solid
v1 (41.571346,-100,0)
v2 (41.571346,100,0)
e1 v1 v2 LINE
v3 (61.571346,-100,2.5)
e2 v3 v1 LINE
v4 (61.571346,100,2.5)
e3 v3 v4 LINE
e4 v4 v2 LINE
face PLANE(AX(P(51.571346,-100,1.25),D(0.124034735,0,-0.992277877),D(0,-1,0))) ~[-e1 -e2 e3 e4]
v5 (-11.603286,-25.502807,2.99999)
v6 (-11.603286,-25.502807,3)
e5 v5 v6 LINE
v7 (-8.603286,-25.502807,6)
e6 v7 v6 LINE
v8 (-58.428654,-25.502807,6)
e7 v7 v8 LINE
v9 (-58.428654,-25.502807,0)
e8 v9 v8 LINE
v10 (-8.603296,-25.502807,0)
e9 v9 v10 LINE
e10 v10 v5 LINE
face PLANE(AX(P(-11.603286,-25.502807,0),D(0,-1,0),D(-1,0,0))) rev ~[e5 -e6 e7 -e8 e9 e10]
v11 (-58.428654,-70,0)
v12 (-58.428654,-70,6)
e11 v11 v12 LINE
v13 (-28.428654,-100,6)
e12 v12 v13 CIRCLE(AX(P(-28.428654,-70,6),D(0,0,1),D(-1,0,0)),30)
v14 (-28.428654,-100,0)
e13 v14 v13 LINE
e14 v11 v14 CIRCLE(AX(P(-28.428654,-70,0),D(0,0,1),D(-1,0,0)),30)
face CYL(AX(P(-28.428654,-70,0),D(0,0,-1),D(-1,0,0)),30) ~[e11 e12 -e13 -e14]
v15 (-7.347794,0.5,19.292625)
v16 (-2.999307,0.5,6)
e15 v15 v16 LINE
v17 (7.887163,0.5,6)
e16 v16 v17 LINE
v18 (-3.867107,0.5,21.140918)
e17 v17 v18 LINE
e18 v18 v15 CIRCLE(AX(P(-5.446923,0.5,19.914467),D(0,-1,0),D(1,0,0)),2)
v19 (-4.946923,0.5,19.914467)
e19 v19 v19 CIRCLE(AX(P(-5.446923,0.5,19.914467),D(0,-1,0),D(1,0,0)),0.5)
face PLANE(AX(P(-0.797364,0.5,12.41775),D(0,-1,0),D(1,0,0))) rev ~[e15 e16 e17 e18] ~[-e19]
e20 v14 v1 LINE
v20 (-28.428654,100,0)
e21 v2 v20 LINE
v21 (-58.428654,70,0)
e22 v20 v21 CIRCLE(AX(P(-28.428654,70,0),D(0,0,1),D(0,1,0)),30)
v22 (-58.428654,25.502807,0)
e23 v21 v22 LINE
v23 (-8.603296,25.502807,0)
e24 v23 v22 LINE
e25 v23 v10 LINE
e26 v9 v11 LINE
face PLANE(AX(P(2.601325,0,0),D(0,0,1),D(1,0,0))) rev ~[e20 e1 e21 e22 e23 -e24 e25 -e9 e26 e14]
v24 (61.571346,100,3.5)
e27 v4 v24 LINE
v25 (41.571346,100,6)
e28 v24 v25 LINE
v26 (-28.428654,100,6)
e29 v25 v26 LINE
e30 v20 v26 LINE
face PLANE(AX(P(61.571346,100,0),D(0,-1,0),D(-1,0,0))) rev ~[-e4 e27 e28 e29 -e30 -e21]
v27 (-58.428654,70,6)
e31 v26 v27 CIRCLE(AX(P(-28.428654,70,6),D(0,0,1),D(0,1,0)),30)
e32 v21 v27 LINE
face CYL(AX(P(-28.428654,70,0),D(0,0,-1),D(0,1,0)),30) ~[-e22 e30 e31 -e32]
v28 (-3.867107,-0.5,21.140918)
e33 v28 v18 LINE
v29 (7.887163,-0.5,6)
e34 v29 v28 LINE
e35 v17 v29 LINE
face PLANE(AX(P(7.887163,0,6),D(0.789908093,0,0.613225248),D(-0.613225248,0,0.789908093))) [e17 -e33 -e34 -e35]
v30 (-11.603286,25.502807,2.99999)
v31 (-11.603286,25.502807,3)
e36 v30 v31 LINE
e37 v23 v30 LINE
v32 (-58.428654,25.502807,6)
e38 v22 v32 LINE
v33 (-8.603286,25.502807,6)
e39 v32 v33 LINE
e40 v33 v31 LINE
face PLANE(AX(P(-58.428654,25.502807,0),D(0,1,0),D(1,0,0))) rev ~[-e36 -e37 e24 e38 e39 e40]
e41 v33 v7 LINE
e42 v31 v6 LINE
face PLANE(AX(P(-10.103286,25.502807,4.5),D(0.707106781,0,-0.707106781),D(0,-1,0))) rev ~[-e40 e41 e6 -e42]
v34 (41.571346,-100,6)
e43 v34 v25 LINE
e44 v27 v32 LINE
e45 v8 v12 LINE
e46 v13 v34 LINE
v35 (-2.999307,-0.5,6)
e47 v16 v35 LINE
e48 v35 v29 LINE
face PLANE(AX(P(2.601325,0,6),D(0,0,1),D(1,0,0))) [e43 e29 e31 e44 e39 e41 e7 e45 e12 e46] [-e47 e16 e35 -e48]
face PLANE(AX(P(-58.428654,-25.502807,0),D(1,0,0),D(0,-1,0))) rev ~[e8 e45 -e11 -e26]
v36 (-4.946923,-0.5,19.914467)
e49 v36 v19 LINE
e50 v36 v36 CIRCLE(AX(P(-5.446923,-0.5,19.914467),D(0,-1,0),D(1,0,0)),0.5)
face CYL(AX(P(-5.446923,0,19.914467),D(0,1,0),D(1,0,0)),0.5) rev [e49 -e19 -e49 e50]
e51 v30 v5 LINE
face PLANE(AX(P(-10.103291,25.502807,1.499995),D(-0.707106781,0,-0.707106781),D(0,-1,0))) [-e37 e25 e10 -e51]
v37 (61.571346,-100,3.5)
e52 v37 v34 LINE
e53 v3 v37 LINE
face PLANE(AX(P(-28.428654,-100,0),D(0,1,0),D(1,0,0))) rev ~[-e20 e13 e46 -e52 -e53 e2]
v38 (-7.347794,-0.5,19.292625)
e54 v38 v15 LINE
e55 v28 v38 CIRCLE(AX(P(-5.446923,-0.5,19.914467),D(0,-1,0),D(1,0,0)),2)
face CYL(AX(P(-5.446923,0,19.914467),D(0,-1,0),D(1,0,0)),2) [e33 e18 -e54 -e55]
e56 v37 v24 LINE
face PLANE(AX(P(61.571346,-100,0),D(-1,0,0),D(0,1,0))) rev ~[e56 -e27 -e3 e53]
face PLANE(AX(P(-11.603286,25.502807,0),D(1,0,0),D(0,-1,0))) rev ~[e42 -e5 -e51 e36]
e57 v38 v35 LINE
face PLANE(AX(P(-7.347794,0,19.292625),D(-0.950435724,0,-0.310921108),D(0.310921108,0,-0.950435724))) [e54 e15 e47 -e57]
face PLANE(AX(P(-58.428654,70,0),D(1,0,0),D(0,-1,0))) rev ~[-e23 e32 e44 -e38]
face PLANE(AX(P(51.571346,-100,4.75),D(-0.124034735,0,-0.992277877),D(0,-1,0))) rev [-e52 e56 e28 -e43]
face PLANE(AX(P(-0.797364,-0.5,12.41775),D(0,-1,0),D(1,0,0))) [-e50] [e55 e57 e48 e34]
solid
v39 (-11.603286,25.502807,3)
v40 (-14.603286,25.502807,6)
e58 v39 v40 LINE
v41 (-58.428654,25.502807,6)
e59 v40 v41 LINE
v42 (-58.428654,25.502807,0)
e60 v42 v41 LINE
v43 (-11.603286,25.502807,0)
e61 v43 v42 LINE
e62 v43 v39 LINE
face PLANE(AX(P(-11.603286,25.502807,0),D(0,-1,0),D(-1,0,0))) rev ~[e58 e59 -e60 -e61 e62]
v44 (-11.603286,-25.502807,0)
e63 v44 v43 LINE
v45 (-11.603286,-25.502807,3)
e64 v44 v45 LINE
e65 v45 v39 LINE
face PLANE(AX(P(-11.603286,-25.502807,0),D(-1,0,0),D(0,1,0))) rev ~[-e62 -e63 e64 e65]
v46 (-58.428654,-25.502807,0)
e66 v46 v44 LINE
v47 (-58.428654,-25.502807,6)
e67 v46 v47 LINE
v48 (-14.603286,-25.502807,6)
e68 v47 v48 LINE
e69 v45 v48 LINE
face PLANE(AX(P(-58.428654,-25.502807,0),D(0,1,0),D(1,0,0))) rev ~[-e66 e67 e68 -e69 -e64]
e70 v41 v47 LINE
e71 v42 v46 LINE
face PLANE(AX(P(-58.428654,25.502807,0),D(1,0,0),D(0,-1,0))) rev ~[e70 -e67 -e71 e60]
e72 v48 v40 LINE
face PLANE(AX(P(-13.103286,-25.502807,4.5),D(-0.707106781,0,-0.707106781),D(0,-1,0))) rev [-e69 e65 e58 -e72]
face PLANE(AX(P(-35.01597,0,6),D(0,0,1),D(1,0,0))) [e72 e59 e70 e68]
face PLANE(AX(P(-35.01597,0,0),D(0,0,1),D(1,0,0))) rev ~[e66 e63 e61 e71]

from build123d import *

# Parameters (mm, degrees)
F1_DEPTH = 6
F2_SIZE2 = 20
F2_SIZE  = 2.5
F3_DEPTH = 6
F4_SIZE2 = 3
F4_SIZE  = 3
F5_SIZE2 = 3
F5_SIZE  = 3
F6_SIZE2 = 2.99999
F6_SIZE  = 2.99999
F7_R     = 0.5
F8_DEPTH = 0.5


# Not quite as in the source:
# - a fillet or chamfer is up to 0.001 mm smaller than in the source, because OpenCascade refuses the exact size


with BuildPart() as f1:
    # F0 (on Top) → F1 (new body)
    with BuildSketch(Plane.XY):
        with BuildLine():
            Line((61.5713464236, -100), (61.5713464236, 100))
            Line((61.5713464236, 100), (-28.4286535764, 100))
            ThreePointArc((-28.4286535764, 100), (-49.641857012, 91.2132034356), (-58.4286535764, 70))
            Line((-58.4286535764, 70), (-58.4286535764, 25.5028065294))
            Line((-58.4286535764, 25.5028065294), (-11.6032855585, 25.5028065294))
            Line((-11.6032855585, 25.5028065294), (-11.6032855585, 0))
            Line((-11.6032855585, 0), (-11.6032855585, -25.5028065294))
            Line((-11.6032855585, -25.5028065294), (-58.4286535764, -25.5028065294))
            Line((-58.4286535764, -25.5028065294), (-58.4286535764, -70))
            ThreePointArc((-58.4286535764, -70), (-49.641857012, -91.2132034356), (-28.4286535764, -100))
            Line((-28.4286535764, -100), (61.5713464236, -100))
        make_face()
    extrude(amount=F1_DEPTH)

    # F2
    f2_edges = [f1.edges().sort_by_distance(p)[0] for p in [
        (61.571346, 0, 6),
        (61.571346, 0, 0),
    ]]
    f2_side = f1.faces().sort_by_distance((61.571346, 0, 3))[0]
    chamfer(f2_edges, length=F2_SIZE, length2=F2_SIZE2, reference=f2_side)

    # F4
    f4_edges = [f1.edges().sort_by_distance(p)[0] for p in [
        (-11.603286, 0, 6),
    ]]
    chamfer(f4_edges, length=F4_SIZE, length2=F4_SIZE2)

    # F6 (size 3 and 3 in the source; OpenCascade refuses exactly that, so slightly less here)
    f6_edges = [f1.edges().sort_by_distance(p)[0] for p in [
        (-11.603286, 0, 0),
    ]]
    chamfer(f6_edges, length=F6_SIZE, length2=F6_SIZE2)

    # F7 (on Front) → F8 (join, symmetric)
    with BuildSketch(Plane.XZ):
        with BuildLine():
            Line((-7.3477944259, 19.2926249586), (-2.9993071221, 6))
            Line((-2.9993071221, 6), (7.8871631995, 6))
            Line((7.8871631995, 6), (-3.8671067929, 21.1409176701))
            ThreePointArc((-3.8671067929, 21.1409176701), (-3.5548827609, 20.5626830442), (-3.4469229787, 19.9144671741))
            ThreePointArc((-3.4469229787, 19.9144671741), (-5.1320761068, 17.9394047834), (-7.3477944259, 19.2926249586))
        make_face()
        with BuildLine():
            ThreePointArc((-3.8671067929, 21.1409176701), (-6.3849078437, 21.6808715426), (-7.3477944259, 19.2926249586))
            ThreePointArc((-7.3477944259, 19.2926249586), (-5.1320761068, 17.9394047834), (-3.4469229787, 19.9144671741))
            ThreePointArc((-3.4469229787, 19.9144671741), (-3.5548827609, 20.5626830442), (-3.8671067929, 21.1409176701))
        make_face()
        with Locations((-5.4469229787, 19.9144671741)):
            Circle(F7_R, mode=Mode.SUBTRACT)
    extrude(amount=F8_DEPTH, both=True)


with BuildPart() as f3:
    # F0 (on Top) → F3 (new body)
    with BuildSketch(Plane.XY):
        Polygon((-11.6032855585, 25.5028065294), (-58.4286535764, 25.5028065294), (-58.4286535764, 0), (-58.4286535764, -25.5028065294), (-11.6032855585, -25.5028065294), (-11.6032855585, 0), align=None)
    extrude(amount=F3_DEPTH)

    # F5
    f5_edges = [f3.edges().sort_by_distance(p)[0] for p in [
        (-11.603286, 0, 6),
    ]]
    chamfer(f5_edges, length=F5_SIZE, length2=F5_SIZE2)


solid = Compound([f1.part, f3.part])
